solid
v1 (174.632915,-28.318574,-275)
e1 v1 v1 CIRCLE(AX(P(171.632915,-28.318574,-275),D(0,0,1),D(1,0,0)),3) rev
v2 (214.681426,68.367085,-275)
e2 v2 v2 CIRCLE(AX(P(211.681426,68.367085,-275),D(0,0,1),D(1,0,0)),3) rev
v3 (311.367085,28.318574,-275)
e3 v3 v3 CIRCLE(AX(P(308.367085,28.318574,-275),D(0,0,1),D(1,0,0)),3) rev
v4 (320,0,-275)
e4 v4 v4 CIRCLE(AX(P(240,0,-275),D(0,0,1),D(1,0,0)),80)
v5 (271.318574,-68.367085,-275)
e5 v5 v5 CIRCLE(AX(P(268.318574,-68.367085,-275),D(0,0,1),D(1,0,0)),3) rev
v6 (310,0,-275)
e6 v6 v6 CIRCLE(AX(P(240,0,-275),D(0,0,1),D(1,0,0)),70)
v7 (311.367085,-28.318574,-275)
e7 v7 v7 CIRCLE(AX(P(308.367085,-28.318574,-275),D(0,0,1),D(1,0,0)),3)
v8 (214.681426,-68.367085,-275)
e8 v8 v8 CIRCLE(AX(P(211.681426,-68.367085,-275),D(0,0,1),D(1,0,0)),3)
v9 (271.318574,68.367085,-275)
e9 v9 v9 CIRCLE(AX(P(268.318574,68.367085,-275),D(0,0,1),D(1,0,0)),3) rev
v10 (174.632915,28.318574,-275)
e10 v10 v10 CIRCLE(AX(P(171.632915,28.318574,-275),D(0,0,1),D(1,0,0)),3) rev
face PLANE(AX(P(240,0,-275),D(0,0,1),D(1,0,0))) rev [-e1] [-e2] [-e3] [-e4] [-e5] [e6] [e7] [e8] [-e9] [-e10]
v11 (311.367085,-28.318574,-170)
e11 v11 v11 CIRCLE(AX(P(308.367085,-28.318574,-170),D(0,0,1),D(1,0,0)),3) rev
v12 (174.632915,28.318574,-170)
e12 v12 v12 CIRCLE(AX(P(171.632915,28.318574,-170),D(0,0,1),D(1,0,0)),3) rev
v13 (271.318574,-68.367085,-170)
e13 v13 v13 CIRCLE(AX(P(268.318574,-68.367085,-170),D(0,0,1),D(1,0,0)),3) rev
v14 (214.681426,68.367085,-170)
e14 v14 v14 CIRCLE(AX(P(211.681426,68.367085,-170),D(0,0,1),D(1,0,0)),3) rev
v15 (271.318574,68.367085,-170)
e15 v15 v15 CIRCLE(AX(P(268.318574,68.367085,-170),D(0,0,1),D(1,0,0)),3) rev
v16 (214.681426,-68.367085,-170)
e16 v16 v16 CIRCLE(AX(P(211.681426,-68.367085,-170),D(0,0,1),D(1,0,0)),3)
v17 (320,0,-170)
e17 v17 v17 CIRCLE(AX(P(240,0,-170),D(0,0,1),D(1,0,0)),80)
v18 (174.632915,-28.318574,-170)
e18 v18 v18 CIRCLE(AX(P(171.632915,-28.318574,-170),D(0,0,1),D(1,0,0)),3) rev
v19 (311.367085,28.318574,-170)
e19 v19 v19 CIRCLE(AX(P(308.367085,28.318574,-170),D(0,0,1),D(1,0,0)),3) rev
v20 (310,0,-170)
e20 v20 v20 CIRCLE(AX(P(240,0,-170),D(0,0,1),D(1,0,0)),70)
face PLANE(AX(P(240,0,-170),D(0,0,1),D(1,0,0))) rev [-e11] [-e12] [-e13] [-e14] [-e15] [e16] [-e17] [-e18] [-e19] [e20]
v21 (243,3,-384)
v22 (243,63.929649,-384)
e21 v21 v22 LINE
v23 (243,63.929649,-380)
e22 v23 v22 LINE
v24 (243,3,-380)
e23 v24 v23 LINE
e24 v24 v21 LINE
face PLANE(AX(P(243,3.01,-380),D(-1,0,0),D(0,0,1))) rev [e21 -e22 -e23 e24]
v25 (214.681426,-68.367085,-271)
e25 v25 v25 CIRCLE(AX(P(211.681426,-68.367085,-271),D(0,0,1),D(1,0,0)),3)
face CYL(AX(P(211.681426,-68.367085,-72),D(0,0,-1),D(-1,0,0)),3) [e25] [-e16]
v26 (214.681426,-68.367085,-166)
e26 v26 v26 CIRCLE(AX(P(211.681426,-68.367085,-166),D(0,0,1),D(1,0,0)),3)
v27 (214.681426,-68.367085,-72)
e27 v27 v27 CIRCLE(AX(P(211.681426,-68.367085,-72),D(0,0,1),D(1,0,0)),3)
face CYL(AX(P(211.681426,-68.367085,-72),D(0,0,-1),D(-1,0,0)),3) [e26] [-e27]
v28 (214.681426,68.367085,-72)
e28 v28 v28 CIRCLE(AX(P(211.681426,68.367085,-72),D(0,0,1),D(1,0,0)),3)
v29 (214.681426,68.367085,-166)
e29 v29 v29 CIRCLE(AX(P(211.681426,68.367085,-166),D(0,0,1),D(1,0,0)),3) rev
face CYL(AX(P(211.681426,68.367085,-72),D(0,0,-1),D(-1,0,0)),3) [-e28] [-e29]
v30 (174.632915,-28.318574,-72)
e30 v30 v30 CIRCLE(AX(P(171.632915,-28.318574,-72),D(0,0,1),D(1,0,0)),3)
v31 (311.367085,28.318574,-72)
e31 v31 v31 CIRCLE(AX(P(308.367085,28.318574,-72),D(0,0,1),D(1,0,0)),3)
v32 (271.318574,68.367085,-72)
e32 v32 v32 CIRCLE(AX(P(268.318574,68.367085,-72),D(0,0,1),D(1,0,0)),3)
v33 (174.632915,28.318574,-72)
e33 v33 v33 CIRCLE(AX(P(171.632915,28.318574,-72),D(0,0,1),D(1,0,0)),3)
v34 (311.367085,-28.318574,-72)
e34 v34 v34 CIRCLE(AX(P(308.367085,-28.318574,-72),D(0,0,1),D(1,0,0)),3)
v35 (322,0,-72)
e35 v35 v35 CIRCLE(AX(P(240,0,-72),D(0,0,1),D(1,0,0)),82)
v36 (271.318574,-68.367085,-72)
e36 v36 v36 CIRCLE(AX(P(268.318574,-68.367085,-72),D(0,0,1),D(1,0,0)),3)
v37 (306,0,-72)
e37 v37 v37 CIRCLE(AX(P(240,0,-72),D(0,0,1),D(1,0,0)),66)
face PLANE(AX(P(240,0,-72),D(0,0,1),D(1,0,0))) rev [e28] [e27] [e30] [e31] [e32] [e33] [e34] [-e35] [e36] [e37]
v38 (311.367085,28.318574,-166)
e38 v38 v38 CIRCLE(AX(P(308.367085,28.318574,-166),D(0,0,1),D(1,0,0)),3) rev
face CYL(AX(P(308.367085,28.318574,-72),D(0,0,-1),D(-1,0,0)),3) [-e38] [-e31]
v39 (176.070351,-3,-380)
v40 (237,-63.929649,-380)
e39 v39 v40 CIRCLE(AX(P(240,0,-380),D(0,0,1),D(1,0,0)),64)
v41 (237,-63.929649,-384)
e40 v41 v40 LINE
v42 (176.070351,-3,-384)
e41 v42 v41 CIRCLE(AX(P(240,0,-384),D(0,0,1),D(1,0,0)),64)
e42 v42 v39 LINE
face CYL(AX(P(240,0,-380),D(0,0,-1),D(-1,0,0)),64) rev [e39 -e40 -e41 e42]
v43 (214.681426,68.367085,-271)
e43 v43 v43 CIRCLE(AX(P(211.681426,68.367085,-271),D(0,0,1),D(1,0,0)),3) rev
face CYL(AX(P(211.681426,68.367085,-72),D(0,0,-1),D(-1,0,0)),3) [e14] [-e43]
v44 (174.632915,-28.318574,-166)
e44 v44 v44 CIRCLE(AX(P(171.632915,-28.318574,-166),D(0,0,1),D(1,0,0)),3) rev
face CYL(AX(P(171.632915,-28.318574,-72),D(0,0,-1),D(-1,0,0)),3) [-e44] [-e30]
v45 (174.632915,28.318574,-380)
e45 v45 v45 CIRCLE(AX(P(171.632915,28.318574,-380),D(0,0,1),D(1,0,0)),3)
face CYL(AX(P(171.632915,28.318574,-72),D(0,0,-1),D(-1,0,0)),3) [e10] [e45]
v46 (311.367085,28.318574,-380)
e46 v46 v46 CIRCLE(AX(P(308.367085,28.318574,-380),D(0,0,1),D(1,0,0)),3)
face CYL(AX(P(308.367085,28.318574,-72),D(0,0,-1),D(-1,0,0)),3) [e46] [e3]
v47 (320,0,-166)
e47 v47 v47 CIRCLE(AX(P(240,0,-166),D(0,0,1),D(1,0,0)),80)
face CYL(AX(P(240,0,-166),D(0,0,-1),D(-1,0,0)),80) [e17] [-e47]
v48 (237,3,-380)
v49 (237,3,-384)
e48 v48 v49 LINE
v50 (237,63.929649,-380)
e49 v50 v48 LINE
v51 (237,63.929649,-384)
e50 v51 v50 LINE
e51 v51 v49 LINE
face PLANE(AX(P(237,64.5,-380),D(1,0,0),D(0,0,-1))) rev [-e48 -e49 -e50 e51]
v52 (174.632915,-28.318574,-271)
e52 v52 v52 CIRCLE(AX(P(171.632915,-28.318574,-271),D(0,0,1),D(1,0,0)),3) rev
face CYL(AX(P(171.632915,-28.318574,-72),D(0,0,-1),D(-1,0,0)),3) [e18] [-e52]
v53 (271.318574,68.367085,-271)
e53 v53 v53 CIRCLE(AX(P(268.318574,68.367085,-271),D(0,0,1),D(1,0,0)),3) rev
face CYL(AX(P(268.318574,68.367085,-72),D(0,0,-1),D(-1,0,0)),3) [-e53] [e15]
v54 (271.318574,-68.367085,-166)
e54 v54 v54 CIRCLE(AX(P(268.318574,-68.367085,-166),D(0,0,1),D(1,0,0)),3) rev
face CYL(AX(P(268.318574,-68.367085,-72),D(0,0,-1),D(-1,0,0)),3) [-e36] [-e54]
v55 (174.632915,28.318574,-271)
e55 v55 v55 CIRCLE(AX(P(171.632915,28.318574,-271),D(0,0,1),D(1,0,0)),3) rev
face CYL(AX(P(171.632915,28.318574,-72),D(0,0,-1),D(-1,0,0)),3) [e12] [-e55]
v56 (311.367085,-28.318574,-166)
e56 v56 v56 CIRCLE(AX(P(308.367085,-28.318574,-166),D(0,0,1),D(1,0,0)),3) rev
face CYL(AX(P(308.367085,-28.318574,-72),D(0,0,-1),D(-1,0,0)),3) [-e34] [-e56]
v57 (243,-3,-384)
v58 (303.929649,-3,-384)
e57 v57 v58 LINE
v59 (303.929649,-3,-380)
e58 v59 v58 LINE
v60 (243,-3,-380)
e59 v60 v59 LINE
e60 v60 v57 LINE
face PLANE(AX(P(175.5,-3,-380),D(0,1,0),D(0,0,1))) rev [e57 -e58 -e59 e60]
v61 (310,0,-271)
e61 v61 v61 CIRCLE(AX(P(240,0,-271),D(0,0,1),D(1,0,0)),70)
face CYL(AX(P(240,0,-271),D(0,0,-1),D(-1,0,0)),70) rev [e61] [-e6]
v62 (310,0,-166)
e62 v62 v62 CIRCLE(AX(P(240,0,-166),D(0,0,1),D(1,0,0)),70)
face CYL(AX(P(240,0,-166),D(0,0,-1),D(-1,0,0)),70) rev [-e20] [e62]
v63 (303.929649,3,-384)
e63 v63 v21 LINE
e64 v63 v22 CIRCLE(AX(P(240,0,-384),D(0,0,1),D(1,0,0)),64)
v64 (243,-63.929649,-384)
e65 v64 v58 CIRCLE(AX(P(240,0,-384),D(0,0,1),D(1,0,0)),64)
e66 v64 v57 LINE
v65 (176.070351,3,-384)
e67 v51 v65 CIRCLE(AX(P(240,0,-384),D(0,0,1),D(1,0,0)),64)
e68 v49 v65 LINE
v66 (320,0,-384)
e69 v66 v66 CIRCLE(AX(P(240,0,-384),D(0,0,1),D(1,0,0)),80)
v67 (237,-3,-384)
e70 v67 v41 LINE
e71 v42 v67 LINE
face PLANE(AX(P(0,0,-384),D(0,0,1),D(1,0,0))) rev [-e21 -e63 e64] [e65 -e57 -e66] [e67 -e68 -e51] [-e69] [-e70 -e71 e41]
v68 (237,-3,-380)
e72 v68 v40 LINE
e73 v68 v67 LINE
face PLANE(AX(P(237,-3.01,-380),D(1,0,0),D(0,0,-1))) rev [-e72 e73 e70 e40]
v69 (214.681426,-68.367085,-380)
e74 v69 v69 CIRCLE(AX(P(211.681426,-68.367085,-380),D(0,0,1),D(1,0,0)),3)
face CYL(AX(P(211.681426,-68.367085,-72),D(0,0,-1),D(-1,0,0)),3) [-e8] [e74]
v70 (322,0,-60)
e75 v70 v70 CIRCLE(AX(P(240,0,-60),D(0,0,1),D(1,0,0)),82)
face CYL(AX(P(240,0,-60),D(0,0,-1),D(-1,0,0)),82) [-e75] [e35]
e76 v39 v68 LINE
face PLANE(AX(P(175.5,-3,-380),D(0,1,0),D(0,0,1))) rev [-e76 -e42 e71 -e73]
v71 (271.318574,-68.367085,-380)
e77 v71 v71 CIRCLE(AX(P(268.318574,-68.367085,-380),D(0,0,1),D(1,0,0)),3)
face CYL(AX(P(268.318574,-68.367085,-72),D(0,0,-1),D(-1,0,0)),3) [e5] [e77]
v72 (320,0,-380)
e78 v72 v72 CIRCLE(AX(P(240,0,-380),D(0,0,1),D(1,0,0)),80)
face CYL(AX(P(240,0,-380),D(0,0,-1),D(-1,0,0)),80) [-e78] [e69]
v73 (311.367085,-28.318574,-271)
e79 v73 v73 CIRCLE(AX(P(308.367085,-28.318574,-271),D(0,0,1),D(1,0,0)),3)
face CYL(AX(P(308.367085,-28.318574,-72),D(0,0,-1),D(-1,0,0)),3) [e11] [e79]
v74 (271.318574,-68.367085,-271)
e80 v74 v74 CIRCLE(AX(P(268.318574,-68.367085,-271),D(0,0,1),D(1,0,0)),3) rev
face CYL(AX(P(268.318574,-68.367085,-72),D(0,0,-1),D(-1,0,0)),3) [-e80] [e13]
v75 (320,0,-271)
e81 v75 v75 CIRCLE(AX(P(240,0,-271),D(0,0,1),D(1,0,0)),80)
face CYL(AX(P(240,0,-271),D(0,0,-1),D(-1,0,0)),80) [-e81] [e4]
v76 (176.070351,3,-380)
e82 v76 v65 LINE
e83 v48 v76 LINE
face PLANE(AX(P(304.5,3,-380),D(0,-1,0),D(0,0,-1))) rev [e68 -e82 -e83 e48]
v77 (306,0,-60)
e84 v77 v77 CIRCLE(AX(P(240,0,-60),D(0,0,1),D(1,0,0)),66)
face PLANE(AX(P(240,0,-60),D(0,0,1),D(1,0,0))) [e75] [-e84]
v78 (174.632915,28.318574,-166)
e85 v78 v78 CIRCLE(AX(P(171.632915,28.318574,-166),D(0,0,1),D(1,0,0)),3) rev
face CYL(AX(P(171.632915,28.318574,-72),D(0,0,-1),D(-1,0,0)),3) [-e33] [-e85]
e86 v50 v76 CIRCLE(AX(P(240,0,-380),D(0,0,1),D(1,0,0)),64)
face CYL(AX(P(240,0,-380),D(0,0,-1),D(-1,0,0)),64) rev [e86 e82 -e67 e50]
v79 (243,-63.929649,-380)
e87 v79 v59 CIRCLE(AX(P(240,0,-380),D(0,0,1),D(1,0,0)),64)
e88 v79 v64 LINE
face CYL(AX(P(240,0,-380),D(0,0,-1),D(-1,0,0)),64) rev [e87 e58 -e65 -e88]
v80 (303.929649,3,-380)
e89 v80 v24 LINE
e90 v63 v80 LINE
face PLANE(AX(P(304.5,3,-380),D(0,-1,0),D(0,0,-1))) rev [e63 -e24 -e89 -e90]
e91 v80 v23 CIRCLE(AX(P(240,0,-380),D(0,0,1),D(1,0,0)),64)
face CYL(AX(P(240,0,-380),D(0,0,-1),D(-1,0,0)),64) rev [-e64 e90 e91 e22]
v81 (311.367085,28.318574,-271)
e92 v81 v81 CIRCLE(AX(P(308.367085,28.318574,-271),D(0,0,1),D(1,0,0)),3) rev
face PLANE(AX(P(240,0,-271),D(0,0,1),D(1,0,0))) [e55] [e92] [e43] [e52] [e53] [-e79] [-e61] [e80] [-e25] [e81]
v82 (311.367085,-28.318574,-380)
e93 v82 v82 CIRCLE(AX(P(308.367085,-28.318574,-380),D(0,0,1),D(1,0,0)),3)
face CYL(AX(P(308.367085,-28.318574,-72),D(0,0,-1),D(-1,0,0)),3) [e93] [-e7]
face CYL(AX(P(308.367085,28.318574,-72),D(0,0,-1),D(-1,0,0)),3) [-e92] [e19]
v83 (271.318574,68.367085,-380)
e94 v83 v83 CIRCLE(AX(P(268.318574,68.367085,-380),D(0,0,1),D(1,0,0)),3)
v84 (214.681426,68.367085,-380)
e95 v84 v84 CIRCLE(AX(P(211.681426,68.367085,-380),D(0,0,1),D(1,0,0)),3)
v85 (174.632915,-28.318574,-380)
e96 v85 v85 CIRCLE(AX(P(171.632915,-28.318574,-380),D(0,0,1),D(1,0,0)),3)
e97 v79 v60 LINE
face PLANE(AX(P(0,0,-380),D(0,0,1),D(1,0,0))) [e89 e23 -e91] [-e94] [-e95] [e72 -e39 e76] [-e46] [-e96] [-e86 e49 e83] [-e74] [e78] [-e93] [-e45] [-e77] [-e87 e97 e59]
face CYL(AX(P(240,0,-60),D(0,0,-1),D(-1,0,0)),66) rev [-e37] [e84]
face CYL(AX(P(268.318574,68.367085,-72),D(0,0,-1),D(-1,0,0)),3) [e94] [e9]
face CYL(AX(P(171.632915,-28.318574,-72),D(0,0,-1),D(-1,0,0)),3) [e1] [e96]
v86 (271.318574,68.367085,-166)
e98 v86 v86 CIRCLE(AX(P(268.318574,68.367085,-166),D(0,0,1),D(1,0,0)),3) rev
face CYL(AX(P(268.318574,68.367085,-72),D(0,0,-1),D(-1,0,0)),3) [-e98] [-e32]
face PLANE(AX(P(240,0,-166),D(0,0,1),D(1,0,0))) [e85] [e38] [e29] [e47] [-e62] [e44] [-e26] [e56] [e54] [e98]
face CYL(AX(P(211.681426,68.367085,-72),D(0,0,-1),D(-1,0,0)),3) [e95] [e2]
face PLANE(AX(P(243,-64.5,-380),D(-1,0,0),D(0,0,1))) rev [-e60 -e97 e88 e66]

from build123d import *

# Parameters (mm, degrees)
EXTRUDE_START                           = -72
EXTRUDE_SKETCH_1_R                      = 82
EXTRUDE_SKETCH_1_R_2                    = 66
EXTRUDE_1_DEPTH                         = 12
EXTRUDE_START_2                         = -380
EXTRUDE_SKETCH_2_R                      = 3
EXTRUDE_2_DEPTH                         = 308
EXTRUDE_SKETCH_3_R                      = 3
EXTRUDE_3_DEPTH                         = 308
EXTRUDE_SKETCH_4_R                      = 3
EXTRUDE_4_DEPTH                         = 308
EXTRUDE_SKETCH_5_R                      = 3
EXTRUDE_5_DEPTH                         = 308
EXTRUDE_SKETCH_6_R                      = 3
EXTRUDE_6_DEPTH                         = 308
EXTRUDE_SKETCH_7_R                      = 3
EXTRUDE_7_DEPTH                         = 308
EXTRUDE_SKETCH_8_R                      = 3
EXTRUDE_8_DEPTH                         = 308
EXTRUDE_SKETCH_9_R                      = 3
EXTRUDE_9_DEPTH                         = 308
EXTRUDE_START_3                         = -170
EXTRUDE_SKETCH_10_R                     = 80
EXTRUDE_SKETCH_10_R_2                   = 70
EXTRUDE_10_DEPTH                        = 4
EXTRUDE_START_4                         = -275
EXTRUDE_SKETCH_11_R                     = 80
EXTRUDE_SKETCH_11_R_2                   = 70
EXTRUDE_11_DEPTH                        = 4
EXTRUDE_START_5                         = -384
EXTRUDE_SKETCH_12_R                     = 80
EXTRUDE_SKETCH_12_R_2                   = 64
EXTRUDE_12_DEPTH                        = 4
EXTRUDE_SKETCH_13_W                     = 129
EXTRUDE_SKETCH_13_H                     = 6
EXTRUDE_13_DEPTH                        = 4
EXTRUDE_SKETCH_14_W                     = 6
EXTRUDE_SKETCH_14_H                     = 61.49
EXTRUDE_14_DEPTH                        = 4
EXTRUDE_SKETCH_15_W                     = 6
EXTRUDE_SKETCH_15_H                     = 61.49
EXTRUDE_15_DEPTH                        = 4
COMBINE_START                           = -384
COMBINE_WELD_ASSEMBLY_OF_FEATURES_OUT_W = 6
COMBINE_WELD_ASSEMBLY_OF_FEATURES_OUT_H = 0.01
COMBINE_WELD_ASSEMBLY_OF_FEATURES_DEPTH = 4


# Read off the part's stored shape, not the designer's step: Combine (weld / assembly of features)
with BuildPart() as part:
    # Extrude sketch 1 → Extrude 1 (new body)
    with BuildSketch(Plane.XY.offset(EXTRUDE_START)):
        with Locations((240, 0)):
            Circle(EXTRUDE_SKETCH_1_R)
        with Locations((240, 0)):
            Circle(EXTRUDE_SKETCH_1_R_2, mode=Mode.SUBTRACT)
    extrude(amount=EXTRUDE_1_DEPTH)


with BuildPart() as body_2:
    # Extrude sketch 2 → Extrude 2 (new body)
    with BuildSketch(Plane.XY.offset(EXTRUDE_START_2)):
        with Locations((308.367085406, 28.318573995)):
            Circle(EXTRUDE_SKETCH_2_R)
    extrude(amount=EXTRUDE_2_DEPTH)


with BuildPart() as body_3:
    # Extrude sketch 3 → Extrude 3 (new body)
    with BuildSketch(Plane.XY.offset(EXTRUDE_START_2)):
        with Locations((268.318573995, 68.367085406)):
            Circle(EXTRUDE_SKETCH_3_R)
    extrude(amount=EXTRUDE_3_DEPTH)


with BuildPart() as body_4:
    # Extrude sketch 4 → Extrude 4 (new body)
    with BuildSketch(Plane.XY.offset(EXTRUDE_START_2)):
        with Locations((211.681426005, 68.367085406)):
            Circle(EXTRUDE_SKETCH_4_R)
    extrude(amount=EXTRUDE_4_DEPTH)


with BuildPart() as body_5:
    # Extrude sketch 5 → Extrude 5 (new body)
    with BuildSketch(Plane.XY.offset(EXTRUDE_START_2)):
        with Locations((171.632914594, 28.318573995)):
            Circle(EXTRUDE_SKETCH_5_R)
    extrude(amount=EXTRUDE_5_DEPTH)


with BuildPart() as body_6:
    # Extrude sketch 6 → Extrude 6 (new body)
    with BuildSketch(Plane.XY.offset(EXTRUDE_START_2)):
        with Locations((171.632914594, -28.318573995)):
            Circle(EXTRUDE_SKETCH_6_R)
    extrude(amount=EXTRUDE_6_DEPTH)


with BuildPart() as body_7:
    # Extrude sketch 7 → Extrude 7 (new body)
    with BuildSketch(Plane.XY.offset(EXTRUDE_START_2)):
        with Locations((211.681426005, -68.367085406)):
            Circle(EXTRUDE_SKETCH_7_R)
    extrude(amount=EXTRUDE_7_DEPTH)



with BuildPart() as body_8:
    # Extrude sketch 8 → Extrude 8 (new body)
    with BuildSketch(Plane.XY.offset(EXTRUDE_START_2)):
        with Locations((268.318573995, -68.367085406)):
            Circle(EXTRUDE_SKETCH_8_R)
    extrude(amount=EXTRUDE_8_DEPTH)


with BuildPart() as body_9:
    # Extrude sketch 9 → Extrude 9 (new body)
    with BuildSketch(Plane.XY.offset(EXTRUDE_START_2)):
        with Locations((308.367085406, -28.318573995)):
            Circle(EXTRUDE_SKETCH_9_R)
    extrude(amount=EXTRUDE_9_DEPTH)


with BuildPart() as body_10:
    # Extrude sketch 10 → Extrude 10 (new body)
    with BuildSketch(Plane.XY.offset(EXTRUDE_START_3)):
        with Locations((240, 0)):
            Circle(EXTRUDE_SKETCH_10_R)
        with Locations((240, 0)):
            Circle(EXTRUDE_SKETCH_10_R_2, mode=Mode.SUBTRACT)
    extrude(amount=EXTRUDE_10_DEPTH)


with BuildPart() as body_11:
    # Extrude sketch 11 → Extrude 11 (new body)
    with BuildSketch(Plane.XY.offset(EXTRUDE_START_4)):
        with Locations((240, 0)):
            Circle(EXTRUDE_SKETCH_11_R)
        with Locations((240, 0)):
            Circle(EXTRUDE_SKETCH_11_R_2, mode=Mode.SUBTRACT)
    extrude(amount=EXTRUDE_11_DEPTH)


with BuildPart() as body_12:
    # Extrude sketch 12 → Extrude 12 (new body)
    with BuildSketch(Plane.XY.offset(EXTRUDE_START_5)):
        with Locations((240, 0)):
            Circle(EXTRUDE_SKETCH_12_R)
        with Locations((240, 0)):
            Circle(EXTRUDE_SKETCH_12_R_2, mode=Mode.SUBTRACT)
    extrude(amount=EXTRUDE_12_DEPTH)


with BuildPart() as body_13:
    # Extrude sketch 13 → Extrude 13 (new body)
    with BuildSketch(Plane.XY.offset(EXTRUDE_START_5)):
        with Locations((240, 0)):
            Rectangle(EXTRUDE_SKETCH_13_W, EXTRUDE_SKETCH_13_H)
    extrude(amount=EXTRUDE_13_DEPTH)


with BuildPart() as body_14:
    # Extrude sketch 14 → Extrude 14 (new body)
    with BuildSketch(Plane.XY.offset(EXTRUDE_START_5)):
        with Locations((240, -33.755)):
            Rectangle(EXTRUDE_SKETCH_14_W, EXTRUDE_SKETCH_14_H)
    extrude(amount=EXTRUDE_14_DEPTH)


with BuildPart() as body_15:
    # Extrude sketch 15 → Extrude 15 (new body)
    with BuildSketch(Plane.XY.offset(EXTRUDE_START_5)):
        with Locations((240, 33.755)):
            Rectangle(EXTRUDE_SKETCH_15_W, EXTRUDE_SKETCH_15_H)
    extrude(amount=EXTRUDE_15_DEPTH)


with BuildPart() as body_7_1:
    add(body_7.part)

    add(body_14.part)  # Combine (weld / assembly of features) merges body 14

    add(body_10.part)  # Combine (weld / assembly of features) merges body 10

    add(body_9.part)  # Combine (weld / assembly of features) merges body 9

    add(body_11.part)  # Combine (weld / assembly of features) merges body 11

    add(part.part)  # Combine (weld / assembly of features) merges part

    add(body_2.part)  # Combine (weld / assembly of features) merges body 2

    add(body_12.part)  # Combine (weld / assembly of features) merges body 12

    add(body_8.part)  # Combine (weld / assembly of features) merges body 8

    add(body_13.part)  # Combine (weld / assembly of features) merges body 13

    add(body_5.part)  # Combine (weld / assembly of features) merges body 5

    add(body_4.part)  # Combine (weld / assembly of features) merges body 4

    add(body_6.part)  # Combine (weld / assembly of features) merges body 6

    add(body_15.part)  # Combine (weld / assembly of features) merges body 15

    add(body_3.part)  # Combine (weld / assembly of features) merges body 3
    # Combine (weld / assembly of features) out → Combine (weld / assembly of features) (add)
    with BuildSketch(Plane.XY.offset(COMBINE_START)):
        with Locations((240, 3.005)):
            Rectangle(COMBINE_WELD_ASSEMBLY_OF_FEATURES_OUT_W, COMBINE_WELD_ASSEMBLY_OF_FEATURES_OUT_H)
        with Locations((240, -3.005)):
            Rectangle(COMBINE_WELD_ASSEMBLY_OF_FEATURES_OUT_W, COMBINE_WELD_ASSEMBLY_OF_FEATURES_OUT_H)
    extrude(amount=COMBINE_WELD_ASSEMBLY_OF_FEATURES_DEPTH)


solid = body_7_1.part
